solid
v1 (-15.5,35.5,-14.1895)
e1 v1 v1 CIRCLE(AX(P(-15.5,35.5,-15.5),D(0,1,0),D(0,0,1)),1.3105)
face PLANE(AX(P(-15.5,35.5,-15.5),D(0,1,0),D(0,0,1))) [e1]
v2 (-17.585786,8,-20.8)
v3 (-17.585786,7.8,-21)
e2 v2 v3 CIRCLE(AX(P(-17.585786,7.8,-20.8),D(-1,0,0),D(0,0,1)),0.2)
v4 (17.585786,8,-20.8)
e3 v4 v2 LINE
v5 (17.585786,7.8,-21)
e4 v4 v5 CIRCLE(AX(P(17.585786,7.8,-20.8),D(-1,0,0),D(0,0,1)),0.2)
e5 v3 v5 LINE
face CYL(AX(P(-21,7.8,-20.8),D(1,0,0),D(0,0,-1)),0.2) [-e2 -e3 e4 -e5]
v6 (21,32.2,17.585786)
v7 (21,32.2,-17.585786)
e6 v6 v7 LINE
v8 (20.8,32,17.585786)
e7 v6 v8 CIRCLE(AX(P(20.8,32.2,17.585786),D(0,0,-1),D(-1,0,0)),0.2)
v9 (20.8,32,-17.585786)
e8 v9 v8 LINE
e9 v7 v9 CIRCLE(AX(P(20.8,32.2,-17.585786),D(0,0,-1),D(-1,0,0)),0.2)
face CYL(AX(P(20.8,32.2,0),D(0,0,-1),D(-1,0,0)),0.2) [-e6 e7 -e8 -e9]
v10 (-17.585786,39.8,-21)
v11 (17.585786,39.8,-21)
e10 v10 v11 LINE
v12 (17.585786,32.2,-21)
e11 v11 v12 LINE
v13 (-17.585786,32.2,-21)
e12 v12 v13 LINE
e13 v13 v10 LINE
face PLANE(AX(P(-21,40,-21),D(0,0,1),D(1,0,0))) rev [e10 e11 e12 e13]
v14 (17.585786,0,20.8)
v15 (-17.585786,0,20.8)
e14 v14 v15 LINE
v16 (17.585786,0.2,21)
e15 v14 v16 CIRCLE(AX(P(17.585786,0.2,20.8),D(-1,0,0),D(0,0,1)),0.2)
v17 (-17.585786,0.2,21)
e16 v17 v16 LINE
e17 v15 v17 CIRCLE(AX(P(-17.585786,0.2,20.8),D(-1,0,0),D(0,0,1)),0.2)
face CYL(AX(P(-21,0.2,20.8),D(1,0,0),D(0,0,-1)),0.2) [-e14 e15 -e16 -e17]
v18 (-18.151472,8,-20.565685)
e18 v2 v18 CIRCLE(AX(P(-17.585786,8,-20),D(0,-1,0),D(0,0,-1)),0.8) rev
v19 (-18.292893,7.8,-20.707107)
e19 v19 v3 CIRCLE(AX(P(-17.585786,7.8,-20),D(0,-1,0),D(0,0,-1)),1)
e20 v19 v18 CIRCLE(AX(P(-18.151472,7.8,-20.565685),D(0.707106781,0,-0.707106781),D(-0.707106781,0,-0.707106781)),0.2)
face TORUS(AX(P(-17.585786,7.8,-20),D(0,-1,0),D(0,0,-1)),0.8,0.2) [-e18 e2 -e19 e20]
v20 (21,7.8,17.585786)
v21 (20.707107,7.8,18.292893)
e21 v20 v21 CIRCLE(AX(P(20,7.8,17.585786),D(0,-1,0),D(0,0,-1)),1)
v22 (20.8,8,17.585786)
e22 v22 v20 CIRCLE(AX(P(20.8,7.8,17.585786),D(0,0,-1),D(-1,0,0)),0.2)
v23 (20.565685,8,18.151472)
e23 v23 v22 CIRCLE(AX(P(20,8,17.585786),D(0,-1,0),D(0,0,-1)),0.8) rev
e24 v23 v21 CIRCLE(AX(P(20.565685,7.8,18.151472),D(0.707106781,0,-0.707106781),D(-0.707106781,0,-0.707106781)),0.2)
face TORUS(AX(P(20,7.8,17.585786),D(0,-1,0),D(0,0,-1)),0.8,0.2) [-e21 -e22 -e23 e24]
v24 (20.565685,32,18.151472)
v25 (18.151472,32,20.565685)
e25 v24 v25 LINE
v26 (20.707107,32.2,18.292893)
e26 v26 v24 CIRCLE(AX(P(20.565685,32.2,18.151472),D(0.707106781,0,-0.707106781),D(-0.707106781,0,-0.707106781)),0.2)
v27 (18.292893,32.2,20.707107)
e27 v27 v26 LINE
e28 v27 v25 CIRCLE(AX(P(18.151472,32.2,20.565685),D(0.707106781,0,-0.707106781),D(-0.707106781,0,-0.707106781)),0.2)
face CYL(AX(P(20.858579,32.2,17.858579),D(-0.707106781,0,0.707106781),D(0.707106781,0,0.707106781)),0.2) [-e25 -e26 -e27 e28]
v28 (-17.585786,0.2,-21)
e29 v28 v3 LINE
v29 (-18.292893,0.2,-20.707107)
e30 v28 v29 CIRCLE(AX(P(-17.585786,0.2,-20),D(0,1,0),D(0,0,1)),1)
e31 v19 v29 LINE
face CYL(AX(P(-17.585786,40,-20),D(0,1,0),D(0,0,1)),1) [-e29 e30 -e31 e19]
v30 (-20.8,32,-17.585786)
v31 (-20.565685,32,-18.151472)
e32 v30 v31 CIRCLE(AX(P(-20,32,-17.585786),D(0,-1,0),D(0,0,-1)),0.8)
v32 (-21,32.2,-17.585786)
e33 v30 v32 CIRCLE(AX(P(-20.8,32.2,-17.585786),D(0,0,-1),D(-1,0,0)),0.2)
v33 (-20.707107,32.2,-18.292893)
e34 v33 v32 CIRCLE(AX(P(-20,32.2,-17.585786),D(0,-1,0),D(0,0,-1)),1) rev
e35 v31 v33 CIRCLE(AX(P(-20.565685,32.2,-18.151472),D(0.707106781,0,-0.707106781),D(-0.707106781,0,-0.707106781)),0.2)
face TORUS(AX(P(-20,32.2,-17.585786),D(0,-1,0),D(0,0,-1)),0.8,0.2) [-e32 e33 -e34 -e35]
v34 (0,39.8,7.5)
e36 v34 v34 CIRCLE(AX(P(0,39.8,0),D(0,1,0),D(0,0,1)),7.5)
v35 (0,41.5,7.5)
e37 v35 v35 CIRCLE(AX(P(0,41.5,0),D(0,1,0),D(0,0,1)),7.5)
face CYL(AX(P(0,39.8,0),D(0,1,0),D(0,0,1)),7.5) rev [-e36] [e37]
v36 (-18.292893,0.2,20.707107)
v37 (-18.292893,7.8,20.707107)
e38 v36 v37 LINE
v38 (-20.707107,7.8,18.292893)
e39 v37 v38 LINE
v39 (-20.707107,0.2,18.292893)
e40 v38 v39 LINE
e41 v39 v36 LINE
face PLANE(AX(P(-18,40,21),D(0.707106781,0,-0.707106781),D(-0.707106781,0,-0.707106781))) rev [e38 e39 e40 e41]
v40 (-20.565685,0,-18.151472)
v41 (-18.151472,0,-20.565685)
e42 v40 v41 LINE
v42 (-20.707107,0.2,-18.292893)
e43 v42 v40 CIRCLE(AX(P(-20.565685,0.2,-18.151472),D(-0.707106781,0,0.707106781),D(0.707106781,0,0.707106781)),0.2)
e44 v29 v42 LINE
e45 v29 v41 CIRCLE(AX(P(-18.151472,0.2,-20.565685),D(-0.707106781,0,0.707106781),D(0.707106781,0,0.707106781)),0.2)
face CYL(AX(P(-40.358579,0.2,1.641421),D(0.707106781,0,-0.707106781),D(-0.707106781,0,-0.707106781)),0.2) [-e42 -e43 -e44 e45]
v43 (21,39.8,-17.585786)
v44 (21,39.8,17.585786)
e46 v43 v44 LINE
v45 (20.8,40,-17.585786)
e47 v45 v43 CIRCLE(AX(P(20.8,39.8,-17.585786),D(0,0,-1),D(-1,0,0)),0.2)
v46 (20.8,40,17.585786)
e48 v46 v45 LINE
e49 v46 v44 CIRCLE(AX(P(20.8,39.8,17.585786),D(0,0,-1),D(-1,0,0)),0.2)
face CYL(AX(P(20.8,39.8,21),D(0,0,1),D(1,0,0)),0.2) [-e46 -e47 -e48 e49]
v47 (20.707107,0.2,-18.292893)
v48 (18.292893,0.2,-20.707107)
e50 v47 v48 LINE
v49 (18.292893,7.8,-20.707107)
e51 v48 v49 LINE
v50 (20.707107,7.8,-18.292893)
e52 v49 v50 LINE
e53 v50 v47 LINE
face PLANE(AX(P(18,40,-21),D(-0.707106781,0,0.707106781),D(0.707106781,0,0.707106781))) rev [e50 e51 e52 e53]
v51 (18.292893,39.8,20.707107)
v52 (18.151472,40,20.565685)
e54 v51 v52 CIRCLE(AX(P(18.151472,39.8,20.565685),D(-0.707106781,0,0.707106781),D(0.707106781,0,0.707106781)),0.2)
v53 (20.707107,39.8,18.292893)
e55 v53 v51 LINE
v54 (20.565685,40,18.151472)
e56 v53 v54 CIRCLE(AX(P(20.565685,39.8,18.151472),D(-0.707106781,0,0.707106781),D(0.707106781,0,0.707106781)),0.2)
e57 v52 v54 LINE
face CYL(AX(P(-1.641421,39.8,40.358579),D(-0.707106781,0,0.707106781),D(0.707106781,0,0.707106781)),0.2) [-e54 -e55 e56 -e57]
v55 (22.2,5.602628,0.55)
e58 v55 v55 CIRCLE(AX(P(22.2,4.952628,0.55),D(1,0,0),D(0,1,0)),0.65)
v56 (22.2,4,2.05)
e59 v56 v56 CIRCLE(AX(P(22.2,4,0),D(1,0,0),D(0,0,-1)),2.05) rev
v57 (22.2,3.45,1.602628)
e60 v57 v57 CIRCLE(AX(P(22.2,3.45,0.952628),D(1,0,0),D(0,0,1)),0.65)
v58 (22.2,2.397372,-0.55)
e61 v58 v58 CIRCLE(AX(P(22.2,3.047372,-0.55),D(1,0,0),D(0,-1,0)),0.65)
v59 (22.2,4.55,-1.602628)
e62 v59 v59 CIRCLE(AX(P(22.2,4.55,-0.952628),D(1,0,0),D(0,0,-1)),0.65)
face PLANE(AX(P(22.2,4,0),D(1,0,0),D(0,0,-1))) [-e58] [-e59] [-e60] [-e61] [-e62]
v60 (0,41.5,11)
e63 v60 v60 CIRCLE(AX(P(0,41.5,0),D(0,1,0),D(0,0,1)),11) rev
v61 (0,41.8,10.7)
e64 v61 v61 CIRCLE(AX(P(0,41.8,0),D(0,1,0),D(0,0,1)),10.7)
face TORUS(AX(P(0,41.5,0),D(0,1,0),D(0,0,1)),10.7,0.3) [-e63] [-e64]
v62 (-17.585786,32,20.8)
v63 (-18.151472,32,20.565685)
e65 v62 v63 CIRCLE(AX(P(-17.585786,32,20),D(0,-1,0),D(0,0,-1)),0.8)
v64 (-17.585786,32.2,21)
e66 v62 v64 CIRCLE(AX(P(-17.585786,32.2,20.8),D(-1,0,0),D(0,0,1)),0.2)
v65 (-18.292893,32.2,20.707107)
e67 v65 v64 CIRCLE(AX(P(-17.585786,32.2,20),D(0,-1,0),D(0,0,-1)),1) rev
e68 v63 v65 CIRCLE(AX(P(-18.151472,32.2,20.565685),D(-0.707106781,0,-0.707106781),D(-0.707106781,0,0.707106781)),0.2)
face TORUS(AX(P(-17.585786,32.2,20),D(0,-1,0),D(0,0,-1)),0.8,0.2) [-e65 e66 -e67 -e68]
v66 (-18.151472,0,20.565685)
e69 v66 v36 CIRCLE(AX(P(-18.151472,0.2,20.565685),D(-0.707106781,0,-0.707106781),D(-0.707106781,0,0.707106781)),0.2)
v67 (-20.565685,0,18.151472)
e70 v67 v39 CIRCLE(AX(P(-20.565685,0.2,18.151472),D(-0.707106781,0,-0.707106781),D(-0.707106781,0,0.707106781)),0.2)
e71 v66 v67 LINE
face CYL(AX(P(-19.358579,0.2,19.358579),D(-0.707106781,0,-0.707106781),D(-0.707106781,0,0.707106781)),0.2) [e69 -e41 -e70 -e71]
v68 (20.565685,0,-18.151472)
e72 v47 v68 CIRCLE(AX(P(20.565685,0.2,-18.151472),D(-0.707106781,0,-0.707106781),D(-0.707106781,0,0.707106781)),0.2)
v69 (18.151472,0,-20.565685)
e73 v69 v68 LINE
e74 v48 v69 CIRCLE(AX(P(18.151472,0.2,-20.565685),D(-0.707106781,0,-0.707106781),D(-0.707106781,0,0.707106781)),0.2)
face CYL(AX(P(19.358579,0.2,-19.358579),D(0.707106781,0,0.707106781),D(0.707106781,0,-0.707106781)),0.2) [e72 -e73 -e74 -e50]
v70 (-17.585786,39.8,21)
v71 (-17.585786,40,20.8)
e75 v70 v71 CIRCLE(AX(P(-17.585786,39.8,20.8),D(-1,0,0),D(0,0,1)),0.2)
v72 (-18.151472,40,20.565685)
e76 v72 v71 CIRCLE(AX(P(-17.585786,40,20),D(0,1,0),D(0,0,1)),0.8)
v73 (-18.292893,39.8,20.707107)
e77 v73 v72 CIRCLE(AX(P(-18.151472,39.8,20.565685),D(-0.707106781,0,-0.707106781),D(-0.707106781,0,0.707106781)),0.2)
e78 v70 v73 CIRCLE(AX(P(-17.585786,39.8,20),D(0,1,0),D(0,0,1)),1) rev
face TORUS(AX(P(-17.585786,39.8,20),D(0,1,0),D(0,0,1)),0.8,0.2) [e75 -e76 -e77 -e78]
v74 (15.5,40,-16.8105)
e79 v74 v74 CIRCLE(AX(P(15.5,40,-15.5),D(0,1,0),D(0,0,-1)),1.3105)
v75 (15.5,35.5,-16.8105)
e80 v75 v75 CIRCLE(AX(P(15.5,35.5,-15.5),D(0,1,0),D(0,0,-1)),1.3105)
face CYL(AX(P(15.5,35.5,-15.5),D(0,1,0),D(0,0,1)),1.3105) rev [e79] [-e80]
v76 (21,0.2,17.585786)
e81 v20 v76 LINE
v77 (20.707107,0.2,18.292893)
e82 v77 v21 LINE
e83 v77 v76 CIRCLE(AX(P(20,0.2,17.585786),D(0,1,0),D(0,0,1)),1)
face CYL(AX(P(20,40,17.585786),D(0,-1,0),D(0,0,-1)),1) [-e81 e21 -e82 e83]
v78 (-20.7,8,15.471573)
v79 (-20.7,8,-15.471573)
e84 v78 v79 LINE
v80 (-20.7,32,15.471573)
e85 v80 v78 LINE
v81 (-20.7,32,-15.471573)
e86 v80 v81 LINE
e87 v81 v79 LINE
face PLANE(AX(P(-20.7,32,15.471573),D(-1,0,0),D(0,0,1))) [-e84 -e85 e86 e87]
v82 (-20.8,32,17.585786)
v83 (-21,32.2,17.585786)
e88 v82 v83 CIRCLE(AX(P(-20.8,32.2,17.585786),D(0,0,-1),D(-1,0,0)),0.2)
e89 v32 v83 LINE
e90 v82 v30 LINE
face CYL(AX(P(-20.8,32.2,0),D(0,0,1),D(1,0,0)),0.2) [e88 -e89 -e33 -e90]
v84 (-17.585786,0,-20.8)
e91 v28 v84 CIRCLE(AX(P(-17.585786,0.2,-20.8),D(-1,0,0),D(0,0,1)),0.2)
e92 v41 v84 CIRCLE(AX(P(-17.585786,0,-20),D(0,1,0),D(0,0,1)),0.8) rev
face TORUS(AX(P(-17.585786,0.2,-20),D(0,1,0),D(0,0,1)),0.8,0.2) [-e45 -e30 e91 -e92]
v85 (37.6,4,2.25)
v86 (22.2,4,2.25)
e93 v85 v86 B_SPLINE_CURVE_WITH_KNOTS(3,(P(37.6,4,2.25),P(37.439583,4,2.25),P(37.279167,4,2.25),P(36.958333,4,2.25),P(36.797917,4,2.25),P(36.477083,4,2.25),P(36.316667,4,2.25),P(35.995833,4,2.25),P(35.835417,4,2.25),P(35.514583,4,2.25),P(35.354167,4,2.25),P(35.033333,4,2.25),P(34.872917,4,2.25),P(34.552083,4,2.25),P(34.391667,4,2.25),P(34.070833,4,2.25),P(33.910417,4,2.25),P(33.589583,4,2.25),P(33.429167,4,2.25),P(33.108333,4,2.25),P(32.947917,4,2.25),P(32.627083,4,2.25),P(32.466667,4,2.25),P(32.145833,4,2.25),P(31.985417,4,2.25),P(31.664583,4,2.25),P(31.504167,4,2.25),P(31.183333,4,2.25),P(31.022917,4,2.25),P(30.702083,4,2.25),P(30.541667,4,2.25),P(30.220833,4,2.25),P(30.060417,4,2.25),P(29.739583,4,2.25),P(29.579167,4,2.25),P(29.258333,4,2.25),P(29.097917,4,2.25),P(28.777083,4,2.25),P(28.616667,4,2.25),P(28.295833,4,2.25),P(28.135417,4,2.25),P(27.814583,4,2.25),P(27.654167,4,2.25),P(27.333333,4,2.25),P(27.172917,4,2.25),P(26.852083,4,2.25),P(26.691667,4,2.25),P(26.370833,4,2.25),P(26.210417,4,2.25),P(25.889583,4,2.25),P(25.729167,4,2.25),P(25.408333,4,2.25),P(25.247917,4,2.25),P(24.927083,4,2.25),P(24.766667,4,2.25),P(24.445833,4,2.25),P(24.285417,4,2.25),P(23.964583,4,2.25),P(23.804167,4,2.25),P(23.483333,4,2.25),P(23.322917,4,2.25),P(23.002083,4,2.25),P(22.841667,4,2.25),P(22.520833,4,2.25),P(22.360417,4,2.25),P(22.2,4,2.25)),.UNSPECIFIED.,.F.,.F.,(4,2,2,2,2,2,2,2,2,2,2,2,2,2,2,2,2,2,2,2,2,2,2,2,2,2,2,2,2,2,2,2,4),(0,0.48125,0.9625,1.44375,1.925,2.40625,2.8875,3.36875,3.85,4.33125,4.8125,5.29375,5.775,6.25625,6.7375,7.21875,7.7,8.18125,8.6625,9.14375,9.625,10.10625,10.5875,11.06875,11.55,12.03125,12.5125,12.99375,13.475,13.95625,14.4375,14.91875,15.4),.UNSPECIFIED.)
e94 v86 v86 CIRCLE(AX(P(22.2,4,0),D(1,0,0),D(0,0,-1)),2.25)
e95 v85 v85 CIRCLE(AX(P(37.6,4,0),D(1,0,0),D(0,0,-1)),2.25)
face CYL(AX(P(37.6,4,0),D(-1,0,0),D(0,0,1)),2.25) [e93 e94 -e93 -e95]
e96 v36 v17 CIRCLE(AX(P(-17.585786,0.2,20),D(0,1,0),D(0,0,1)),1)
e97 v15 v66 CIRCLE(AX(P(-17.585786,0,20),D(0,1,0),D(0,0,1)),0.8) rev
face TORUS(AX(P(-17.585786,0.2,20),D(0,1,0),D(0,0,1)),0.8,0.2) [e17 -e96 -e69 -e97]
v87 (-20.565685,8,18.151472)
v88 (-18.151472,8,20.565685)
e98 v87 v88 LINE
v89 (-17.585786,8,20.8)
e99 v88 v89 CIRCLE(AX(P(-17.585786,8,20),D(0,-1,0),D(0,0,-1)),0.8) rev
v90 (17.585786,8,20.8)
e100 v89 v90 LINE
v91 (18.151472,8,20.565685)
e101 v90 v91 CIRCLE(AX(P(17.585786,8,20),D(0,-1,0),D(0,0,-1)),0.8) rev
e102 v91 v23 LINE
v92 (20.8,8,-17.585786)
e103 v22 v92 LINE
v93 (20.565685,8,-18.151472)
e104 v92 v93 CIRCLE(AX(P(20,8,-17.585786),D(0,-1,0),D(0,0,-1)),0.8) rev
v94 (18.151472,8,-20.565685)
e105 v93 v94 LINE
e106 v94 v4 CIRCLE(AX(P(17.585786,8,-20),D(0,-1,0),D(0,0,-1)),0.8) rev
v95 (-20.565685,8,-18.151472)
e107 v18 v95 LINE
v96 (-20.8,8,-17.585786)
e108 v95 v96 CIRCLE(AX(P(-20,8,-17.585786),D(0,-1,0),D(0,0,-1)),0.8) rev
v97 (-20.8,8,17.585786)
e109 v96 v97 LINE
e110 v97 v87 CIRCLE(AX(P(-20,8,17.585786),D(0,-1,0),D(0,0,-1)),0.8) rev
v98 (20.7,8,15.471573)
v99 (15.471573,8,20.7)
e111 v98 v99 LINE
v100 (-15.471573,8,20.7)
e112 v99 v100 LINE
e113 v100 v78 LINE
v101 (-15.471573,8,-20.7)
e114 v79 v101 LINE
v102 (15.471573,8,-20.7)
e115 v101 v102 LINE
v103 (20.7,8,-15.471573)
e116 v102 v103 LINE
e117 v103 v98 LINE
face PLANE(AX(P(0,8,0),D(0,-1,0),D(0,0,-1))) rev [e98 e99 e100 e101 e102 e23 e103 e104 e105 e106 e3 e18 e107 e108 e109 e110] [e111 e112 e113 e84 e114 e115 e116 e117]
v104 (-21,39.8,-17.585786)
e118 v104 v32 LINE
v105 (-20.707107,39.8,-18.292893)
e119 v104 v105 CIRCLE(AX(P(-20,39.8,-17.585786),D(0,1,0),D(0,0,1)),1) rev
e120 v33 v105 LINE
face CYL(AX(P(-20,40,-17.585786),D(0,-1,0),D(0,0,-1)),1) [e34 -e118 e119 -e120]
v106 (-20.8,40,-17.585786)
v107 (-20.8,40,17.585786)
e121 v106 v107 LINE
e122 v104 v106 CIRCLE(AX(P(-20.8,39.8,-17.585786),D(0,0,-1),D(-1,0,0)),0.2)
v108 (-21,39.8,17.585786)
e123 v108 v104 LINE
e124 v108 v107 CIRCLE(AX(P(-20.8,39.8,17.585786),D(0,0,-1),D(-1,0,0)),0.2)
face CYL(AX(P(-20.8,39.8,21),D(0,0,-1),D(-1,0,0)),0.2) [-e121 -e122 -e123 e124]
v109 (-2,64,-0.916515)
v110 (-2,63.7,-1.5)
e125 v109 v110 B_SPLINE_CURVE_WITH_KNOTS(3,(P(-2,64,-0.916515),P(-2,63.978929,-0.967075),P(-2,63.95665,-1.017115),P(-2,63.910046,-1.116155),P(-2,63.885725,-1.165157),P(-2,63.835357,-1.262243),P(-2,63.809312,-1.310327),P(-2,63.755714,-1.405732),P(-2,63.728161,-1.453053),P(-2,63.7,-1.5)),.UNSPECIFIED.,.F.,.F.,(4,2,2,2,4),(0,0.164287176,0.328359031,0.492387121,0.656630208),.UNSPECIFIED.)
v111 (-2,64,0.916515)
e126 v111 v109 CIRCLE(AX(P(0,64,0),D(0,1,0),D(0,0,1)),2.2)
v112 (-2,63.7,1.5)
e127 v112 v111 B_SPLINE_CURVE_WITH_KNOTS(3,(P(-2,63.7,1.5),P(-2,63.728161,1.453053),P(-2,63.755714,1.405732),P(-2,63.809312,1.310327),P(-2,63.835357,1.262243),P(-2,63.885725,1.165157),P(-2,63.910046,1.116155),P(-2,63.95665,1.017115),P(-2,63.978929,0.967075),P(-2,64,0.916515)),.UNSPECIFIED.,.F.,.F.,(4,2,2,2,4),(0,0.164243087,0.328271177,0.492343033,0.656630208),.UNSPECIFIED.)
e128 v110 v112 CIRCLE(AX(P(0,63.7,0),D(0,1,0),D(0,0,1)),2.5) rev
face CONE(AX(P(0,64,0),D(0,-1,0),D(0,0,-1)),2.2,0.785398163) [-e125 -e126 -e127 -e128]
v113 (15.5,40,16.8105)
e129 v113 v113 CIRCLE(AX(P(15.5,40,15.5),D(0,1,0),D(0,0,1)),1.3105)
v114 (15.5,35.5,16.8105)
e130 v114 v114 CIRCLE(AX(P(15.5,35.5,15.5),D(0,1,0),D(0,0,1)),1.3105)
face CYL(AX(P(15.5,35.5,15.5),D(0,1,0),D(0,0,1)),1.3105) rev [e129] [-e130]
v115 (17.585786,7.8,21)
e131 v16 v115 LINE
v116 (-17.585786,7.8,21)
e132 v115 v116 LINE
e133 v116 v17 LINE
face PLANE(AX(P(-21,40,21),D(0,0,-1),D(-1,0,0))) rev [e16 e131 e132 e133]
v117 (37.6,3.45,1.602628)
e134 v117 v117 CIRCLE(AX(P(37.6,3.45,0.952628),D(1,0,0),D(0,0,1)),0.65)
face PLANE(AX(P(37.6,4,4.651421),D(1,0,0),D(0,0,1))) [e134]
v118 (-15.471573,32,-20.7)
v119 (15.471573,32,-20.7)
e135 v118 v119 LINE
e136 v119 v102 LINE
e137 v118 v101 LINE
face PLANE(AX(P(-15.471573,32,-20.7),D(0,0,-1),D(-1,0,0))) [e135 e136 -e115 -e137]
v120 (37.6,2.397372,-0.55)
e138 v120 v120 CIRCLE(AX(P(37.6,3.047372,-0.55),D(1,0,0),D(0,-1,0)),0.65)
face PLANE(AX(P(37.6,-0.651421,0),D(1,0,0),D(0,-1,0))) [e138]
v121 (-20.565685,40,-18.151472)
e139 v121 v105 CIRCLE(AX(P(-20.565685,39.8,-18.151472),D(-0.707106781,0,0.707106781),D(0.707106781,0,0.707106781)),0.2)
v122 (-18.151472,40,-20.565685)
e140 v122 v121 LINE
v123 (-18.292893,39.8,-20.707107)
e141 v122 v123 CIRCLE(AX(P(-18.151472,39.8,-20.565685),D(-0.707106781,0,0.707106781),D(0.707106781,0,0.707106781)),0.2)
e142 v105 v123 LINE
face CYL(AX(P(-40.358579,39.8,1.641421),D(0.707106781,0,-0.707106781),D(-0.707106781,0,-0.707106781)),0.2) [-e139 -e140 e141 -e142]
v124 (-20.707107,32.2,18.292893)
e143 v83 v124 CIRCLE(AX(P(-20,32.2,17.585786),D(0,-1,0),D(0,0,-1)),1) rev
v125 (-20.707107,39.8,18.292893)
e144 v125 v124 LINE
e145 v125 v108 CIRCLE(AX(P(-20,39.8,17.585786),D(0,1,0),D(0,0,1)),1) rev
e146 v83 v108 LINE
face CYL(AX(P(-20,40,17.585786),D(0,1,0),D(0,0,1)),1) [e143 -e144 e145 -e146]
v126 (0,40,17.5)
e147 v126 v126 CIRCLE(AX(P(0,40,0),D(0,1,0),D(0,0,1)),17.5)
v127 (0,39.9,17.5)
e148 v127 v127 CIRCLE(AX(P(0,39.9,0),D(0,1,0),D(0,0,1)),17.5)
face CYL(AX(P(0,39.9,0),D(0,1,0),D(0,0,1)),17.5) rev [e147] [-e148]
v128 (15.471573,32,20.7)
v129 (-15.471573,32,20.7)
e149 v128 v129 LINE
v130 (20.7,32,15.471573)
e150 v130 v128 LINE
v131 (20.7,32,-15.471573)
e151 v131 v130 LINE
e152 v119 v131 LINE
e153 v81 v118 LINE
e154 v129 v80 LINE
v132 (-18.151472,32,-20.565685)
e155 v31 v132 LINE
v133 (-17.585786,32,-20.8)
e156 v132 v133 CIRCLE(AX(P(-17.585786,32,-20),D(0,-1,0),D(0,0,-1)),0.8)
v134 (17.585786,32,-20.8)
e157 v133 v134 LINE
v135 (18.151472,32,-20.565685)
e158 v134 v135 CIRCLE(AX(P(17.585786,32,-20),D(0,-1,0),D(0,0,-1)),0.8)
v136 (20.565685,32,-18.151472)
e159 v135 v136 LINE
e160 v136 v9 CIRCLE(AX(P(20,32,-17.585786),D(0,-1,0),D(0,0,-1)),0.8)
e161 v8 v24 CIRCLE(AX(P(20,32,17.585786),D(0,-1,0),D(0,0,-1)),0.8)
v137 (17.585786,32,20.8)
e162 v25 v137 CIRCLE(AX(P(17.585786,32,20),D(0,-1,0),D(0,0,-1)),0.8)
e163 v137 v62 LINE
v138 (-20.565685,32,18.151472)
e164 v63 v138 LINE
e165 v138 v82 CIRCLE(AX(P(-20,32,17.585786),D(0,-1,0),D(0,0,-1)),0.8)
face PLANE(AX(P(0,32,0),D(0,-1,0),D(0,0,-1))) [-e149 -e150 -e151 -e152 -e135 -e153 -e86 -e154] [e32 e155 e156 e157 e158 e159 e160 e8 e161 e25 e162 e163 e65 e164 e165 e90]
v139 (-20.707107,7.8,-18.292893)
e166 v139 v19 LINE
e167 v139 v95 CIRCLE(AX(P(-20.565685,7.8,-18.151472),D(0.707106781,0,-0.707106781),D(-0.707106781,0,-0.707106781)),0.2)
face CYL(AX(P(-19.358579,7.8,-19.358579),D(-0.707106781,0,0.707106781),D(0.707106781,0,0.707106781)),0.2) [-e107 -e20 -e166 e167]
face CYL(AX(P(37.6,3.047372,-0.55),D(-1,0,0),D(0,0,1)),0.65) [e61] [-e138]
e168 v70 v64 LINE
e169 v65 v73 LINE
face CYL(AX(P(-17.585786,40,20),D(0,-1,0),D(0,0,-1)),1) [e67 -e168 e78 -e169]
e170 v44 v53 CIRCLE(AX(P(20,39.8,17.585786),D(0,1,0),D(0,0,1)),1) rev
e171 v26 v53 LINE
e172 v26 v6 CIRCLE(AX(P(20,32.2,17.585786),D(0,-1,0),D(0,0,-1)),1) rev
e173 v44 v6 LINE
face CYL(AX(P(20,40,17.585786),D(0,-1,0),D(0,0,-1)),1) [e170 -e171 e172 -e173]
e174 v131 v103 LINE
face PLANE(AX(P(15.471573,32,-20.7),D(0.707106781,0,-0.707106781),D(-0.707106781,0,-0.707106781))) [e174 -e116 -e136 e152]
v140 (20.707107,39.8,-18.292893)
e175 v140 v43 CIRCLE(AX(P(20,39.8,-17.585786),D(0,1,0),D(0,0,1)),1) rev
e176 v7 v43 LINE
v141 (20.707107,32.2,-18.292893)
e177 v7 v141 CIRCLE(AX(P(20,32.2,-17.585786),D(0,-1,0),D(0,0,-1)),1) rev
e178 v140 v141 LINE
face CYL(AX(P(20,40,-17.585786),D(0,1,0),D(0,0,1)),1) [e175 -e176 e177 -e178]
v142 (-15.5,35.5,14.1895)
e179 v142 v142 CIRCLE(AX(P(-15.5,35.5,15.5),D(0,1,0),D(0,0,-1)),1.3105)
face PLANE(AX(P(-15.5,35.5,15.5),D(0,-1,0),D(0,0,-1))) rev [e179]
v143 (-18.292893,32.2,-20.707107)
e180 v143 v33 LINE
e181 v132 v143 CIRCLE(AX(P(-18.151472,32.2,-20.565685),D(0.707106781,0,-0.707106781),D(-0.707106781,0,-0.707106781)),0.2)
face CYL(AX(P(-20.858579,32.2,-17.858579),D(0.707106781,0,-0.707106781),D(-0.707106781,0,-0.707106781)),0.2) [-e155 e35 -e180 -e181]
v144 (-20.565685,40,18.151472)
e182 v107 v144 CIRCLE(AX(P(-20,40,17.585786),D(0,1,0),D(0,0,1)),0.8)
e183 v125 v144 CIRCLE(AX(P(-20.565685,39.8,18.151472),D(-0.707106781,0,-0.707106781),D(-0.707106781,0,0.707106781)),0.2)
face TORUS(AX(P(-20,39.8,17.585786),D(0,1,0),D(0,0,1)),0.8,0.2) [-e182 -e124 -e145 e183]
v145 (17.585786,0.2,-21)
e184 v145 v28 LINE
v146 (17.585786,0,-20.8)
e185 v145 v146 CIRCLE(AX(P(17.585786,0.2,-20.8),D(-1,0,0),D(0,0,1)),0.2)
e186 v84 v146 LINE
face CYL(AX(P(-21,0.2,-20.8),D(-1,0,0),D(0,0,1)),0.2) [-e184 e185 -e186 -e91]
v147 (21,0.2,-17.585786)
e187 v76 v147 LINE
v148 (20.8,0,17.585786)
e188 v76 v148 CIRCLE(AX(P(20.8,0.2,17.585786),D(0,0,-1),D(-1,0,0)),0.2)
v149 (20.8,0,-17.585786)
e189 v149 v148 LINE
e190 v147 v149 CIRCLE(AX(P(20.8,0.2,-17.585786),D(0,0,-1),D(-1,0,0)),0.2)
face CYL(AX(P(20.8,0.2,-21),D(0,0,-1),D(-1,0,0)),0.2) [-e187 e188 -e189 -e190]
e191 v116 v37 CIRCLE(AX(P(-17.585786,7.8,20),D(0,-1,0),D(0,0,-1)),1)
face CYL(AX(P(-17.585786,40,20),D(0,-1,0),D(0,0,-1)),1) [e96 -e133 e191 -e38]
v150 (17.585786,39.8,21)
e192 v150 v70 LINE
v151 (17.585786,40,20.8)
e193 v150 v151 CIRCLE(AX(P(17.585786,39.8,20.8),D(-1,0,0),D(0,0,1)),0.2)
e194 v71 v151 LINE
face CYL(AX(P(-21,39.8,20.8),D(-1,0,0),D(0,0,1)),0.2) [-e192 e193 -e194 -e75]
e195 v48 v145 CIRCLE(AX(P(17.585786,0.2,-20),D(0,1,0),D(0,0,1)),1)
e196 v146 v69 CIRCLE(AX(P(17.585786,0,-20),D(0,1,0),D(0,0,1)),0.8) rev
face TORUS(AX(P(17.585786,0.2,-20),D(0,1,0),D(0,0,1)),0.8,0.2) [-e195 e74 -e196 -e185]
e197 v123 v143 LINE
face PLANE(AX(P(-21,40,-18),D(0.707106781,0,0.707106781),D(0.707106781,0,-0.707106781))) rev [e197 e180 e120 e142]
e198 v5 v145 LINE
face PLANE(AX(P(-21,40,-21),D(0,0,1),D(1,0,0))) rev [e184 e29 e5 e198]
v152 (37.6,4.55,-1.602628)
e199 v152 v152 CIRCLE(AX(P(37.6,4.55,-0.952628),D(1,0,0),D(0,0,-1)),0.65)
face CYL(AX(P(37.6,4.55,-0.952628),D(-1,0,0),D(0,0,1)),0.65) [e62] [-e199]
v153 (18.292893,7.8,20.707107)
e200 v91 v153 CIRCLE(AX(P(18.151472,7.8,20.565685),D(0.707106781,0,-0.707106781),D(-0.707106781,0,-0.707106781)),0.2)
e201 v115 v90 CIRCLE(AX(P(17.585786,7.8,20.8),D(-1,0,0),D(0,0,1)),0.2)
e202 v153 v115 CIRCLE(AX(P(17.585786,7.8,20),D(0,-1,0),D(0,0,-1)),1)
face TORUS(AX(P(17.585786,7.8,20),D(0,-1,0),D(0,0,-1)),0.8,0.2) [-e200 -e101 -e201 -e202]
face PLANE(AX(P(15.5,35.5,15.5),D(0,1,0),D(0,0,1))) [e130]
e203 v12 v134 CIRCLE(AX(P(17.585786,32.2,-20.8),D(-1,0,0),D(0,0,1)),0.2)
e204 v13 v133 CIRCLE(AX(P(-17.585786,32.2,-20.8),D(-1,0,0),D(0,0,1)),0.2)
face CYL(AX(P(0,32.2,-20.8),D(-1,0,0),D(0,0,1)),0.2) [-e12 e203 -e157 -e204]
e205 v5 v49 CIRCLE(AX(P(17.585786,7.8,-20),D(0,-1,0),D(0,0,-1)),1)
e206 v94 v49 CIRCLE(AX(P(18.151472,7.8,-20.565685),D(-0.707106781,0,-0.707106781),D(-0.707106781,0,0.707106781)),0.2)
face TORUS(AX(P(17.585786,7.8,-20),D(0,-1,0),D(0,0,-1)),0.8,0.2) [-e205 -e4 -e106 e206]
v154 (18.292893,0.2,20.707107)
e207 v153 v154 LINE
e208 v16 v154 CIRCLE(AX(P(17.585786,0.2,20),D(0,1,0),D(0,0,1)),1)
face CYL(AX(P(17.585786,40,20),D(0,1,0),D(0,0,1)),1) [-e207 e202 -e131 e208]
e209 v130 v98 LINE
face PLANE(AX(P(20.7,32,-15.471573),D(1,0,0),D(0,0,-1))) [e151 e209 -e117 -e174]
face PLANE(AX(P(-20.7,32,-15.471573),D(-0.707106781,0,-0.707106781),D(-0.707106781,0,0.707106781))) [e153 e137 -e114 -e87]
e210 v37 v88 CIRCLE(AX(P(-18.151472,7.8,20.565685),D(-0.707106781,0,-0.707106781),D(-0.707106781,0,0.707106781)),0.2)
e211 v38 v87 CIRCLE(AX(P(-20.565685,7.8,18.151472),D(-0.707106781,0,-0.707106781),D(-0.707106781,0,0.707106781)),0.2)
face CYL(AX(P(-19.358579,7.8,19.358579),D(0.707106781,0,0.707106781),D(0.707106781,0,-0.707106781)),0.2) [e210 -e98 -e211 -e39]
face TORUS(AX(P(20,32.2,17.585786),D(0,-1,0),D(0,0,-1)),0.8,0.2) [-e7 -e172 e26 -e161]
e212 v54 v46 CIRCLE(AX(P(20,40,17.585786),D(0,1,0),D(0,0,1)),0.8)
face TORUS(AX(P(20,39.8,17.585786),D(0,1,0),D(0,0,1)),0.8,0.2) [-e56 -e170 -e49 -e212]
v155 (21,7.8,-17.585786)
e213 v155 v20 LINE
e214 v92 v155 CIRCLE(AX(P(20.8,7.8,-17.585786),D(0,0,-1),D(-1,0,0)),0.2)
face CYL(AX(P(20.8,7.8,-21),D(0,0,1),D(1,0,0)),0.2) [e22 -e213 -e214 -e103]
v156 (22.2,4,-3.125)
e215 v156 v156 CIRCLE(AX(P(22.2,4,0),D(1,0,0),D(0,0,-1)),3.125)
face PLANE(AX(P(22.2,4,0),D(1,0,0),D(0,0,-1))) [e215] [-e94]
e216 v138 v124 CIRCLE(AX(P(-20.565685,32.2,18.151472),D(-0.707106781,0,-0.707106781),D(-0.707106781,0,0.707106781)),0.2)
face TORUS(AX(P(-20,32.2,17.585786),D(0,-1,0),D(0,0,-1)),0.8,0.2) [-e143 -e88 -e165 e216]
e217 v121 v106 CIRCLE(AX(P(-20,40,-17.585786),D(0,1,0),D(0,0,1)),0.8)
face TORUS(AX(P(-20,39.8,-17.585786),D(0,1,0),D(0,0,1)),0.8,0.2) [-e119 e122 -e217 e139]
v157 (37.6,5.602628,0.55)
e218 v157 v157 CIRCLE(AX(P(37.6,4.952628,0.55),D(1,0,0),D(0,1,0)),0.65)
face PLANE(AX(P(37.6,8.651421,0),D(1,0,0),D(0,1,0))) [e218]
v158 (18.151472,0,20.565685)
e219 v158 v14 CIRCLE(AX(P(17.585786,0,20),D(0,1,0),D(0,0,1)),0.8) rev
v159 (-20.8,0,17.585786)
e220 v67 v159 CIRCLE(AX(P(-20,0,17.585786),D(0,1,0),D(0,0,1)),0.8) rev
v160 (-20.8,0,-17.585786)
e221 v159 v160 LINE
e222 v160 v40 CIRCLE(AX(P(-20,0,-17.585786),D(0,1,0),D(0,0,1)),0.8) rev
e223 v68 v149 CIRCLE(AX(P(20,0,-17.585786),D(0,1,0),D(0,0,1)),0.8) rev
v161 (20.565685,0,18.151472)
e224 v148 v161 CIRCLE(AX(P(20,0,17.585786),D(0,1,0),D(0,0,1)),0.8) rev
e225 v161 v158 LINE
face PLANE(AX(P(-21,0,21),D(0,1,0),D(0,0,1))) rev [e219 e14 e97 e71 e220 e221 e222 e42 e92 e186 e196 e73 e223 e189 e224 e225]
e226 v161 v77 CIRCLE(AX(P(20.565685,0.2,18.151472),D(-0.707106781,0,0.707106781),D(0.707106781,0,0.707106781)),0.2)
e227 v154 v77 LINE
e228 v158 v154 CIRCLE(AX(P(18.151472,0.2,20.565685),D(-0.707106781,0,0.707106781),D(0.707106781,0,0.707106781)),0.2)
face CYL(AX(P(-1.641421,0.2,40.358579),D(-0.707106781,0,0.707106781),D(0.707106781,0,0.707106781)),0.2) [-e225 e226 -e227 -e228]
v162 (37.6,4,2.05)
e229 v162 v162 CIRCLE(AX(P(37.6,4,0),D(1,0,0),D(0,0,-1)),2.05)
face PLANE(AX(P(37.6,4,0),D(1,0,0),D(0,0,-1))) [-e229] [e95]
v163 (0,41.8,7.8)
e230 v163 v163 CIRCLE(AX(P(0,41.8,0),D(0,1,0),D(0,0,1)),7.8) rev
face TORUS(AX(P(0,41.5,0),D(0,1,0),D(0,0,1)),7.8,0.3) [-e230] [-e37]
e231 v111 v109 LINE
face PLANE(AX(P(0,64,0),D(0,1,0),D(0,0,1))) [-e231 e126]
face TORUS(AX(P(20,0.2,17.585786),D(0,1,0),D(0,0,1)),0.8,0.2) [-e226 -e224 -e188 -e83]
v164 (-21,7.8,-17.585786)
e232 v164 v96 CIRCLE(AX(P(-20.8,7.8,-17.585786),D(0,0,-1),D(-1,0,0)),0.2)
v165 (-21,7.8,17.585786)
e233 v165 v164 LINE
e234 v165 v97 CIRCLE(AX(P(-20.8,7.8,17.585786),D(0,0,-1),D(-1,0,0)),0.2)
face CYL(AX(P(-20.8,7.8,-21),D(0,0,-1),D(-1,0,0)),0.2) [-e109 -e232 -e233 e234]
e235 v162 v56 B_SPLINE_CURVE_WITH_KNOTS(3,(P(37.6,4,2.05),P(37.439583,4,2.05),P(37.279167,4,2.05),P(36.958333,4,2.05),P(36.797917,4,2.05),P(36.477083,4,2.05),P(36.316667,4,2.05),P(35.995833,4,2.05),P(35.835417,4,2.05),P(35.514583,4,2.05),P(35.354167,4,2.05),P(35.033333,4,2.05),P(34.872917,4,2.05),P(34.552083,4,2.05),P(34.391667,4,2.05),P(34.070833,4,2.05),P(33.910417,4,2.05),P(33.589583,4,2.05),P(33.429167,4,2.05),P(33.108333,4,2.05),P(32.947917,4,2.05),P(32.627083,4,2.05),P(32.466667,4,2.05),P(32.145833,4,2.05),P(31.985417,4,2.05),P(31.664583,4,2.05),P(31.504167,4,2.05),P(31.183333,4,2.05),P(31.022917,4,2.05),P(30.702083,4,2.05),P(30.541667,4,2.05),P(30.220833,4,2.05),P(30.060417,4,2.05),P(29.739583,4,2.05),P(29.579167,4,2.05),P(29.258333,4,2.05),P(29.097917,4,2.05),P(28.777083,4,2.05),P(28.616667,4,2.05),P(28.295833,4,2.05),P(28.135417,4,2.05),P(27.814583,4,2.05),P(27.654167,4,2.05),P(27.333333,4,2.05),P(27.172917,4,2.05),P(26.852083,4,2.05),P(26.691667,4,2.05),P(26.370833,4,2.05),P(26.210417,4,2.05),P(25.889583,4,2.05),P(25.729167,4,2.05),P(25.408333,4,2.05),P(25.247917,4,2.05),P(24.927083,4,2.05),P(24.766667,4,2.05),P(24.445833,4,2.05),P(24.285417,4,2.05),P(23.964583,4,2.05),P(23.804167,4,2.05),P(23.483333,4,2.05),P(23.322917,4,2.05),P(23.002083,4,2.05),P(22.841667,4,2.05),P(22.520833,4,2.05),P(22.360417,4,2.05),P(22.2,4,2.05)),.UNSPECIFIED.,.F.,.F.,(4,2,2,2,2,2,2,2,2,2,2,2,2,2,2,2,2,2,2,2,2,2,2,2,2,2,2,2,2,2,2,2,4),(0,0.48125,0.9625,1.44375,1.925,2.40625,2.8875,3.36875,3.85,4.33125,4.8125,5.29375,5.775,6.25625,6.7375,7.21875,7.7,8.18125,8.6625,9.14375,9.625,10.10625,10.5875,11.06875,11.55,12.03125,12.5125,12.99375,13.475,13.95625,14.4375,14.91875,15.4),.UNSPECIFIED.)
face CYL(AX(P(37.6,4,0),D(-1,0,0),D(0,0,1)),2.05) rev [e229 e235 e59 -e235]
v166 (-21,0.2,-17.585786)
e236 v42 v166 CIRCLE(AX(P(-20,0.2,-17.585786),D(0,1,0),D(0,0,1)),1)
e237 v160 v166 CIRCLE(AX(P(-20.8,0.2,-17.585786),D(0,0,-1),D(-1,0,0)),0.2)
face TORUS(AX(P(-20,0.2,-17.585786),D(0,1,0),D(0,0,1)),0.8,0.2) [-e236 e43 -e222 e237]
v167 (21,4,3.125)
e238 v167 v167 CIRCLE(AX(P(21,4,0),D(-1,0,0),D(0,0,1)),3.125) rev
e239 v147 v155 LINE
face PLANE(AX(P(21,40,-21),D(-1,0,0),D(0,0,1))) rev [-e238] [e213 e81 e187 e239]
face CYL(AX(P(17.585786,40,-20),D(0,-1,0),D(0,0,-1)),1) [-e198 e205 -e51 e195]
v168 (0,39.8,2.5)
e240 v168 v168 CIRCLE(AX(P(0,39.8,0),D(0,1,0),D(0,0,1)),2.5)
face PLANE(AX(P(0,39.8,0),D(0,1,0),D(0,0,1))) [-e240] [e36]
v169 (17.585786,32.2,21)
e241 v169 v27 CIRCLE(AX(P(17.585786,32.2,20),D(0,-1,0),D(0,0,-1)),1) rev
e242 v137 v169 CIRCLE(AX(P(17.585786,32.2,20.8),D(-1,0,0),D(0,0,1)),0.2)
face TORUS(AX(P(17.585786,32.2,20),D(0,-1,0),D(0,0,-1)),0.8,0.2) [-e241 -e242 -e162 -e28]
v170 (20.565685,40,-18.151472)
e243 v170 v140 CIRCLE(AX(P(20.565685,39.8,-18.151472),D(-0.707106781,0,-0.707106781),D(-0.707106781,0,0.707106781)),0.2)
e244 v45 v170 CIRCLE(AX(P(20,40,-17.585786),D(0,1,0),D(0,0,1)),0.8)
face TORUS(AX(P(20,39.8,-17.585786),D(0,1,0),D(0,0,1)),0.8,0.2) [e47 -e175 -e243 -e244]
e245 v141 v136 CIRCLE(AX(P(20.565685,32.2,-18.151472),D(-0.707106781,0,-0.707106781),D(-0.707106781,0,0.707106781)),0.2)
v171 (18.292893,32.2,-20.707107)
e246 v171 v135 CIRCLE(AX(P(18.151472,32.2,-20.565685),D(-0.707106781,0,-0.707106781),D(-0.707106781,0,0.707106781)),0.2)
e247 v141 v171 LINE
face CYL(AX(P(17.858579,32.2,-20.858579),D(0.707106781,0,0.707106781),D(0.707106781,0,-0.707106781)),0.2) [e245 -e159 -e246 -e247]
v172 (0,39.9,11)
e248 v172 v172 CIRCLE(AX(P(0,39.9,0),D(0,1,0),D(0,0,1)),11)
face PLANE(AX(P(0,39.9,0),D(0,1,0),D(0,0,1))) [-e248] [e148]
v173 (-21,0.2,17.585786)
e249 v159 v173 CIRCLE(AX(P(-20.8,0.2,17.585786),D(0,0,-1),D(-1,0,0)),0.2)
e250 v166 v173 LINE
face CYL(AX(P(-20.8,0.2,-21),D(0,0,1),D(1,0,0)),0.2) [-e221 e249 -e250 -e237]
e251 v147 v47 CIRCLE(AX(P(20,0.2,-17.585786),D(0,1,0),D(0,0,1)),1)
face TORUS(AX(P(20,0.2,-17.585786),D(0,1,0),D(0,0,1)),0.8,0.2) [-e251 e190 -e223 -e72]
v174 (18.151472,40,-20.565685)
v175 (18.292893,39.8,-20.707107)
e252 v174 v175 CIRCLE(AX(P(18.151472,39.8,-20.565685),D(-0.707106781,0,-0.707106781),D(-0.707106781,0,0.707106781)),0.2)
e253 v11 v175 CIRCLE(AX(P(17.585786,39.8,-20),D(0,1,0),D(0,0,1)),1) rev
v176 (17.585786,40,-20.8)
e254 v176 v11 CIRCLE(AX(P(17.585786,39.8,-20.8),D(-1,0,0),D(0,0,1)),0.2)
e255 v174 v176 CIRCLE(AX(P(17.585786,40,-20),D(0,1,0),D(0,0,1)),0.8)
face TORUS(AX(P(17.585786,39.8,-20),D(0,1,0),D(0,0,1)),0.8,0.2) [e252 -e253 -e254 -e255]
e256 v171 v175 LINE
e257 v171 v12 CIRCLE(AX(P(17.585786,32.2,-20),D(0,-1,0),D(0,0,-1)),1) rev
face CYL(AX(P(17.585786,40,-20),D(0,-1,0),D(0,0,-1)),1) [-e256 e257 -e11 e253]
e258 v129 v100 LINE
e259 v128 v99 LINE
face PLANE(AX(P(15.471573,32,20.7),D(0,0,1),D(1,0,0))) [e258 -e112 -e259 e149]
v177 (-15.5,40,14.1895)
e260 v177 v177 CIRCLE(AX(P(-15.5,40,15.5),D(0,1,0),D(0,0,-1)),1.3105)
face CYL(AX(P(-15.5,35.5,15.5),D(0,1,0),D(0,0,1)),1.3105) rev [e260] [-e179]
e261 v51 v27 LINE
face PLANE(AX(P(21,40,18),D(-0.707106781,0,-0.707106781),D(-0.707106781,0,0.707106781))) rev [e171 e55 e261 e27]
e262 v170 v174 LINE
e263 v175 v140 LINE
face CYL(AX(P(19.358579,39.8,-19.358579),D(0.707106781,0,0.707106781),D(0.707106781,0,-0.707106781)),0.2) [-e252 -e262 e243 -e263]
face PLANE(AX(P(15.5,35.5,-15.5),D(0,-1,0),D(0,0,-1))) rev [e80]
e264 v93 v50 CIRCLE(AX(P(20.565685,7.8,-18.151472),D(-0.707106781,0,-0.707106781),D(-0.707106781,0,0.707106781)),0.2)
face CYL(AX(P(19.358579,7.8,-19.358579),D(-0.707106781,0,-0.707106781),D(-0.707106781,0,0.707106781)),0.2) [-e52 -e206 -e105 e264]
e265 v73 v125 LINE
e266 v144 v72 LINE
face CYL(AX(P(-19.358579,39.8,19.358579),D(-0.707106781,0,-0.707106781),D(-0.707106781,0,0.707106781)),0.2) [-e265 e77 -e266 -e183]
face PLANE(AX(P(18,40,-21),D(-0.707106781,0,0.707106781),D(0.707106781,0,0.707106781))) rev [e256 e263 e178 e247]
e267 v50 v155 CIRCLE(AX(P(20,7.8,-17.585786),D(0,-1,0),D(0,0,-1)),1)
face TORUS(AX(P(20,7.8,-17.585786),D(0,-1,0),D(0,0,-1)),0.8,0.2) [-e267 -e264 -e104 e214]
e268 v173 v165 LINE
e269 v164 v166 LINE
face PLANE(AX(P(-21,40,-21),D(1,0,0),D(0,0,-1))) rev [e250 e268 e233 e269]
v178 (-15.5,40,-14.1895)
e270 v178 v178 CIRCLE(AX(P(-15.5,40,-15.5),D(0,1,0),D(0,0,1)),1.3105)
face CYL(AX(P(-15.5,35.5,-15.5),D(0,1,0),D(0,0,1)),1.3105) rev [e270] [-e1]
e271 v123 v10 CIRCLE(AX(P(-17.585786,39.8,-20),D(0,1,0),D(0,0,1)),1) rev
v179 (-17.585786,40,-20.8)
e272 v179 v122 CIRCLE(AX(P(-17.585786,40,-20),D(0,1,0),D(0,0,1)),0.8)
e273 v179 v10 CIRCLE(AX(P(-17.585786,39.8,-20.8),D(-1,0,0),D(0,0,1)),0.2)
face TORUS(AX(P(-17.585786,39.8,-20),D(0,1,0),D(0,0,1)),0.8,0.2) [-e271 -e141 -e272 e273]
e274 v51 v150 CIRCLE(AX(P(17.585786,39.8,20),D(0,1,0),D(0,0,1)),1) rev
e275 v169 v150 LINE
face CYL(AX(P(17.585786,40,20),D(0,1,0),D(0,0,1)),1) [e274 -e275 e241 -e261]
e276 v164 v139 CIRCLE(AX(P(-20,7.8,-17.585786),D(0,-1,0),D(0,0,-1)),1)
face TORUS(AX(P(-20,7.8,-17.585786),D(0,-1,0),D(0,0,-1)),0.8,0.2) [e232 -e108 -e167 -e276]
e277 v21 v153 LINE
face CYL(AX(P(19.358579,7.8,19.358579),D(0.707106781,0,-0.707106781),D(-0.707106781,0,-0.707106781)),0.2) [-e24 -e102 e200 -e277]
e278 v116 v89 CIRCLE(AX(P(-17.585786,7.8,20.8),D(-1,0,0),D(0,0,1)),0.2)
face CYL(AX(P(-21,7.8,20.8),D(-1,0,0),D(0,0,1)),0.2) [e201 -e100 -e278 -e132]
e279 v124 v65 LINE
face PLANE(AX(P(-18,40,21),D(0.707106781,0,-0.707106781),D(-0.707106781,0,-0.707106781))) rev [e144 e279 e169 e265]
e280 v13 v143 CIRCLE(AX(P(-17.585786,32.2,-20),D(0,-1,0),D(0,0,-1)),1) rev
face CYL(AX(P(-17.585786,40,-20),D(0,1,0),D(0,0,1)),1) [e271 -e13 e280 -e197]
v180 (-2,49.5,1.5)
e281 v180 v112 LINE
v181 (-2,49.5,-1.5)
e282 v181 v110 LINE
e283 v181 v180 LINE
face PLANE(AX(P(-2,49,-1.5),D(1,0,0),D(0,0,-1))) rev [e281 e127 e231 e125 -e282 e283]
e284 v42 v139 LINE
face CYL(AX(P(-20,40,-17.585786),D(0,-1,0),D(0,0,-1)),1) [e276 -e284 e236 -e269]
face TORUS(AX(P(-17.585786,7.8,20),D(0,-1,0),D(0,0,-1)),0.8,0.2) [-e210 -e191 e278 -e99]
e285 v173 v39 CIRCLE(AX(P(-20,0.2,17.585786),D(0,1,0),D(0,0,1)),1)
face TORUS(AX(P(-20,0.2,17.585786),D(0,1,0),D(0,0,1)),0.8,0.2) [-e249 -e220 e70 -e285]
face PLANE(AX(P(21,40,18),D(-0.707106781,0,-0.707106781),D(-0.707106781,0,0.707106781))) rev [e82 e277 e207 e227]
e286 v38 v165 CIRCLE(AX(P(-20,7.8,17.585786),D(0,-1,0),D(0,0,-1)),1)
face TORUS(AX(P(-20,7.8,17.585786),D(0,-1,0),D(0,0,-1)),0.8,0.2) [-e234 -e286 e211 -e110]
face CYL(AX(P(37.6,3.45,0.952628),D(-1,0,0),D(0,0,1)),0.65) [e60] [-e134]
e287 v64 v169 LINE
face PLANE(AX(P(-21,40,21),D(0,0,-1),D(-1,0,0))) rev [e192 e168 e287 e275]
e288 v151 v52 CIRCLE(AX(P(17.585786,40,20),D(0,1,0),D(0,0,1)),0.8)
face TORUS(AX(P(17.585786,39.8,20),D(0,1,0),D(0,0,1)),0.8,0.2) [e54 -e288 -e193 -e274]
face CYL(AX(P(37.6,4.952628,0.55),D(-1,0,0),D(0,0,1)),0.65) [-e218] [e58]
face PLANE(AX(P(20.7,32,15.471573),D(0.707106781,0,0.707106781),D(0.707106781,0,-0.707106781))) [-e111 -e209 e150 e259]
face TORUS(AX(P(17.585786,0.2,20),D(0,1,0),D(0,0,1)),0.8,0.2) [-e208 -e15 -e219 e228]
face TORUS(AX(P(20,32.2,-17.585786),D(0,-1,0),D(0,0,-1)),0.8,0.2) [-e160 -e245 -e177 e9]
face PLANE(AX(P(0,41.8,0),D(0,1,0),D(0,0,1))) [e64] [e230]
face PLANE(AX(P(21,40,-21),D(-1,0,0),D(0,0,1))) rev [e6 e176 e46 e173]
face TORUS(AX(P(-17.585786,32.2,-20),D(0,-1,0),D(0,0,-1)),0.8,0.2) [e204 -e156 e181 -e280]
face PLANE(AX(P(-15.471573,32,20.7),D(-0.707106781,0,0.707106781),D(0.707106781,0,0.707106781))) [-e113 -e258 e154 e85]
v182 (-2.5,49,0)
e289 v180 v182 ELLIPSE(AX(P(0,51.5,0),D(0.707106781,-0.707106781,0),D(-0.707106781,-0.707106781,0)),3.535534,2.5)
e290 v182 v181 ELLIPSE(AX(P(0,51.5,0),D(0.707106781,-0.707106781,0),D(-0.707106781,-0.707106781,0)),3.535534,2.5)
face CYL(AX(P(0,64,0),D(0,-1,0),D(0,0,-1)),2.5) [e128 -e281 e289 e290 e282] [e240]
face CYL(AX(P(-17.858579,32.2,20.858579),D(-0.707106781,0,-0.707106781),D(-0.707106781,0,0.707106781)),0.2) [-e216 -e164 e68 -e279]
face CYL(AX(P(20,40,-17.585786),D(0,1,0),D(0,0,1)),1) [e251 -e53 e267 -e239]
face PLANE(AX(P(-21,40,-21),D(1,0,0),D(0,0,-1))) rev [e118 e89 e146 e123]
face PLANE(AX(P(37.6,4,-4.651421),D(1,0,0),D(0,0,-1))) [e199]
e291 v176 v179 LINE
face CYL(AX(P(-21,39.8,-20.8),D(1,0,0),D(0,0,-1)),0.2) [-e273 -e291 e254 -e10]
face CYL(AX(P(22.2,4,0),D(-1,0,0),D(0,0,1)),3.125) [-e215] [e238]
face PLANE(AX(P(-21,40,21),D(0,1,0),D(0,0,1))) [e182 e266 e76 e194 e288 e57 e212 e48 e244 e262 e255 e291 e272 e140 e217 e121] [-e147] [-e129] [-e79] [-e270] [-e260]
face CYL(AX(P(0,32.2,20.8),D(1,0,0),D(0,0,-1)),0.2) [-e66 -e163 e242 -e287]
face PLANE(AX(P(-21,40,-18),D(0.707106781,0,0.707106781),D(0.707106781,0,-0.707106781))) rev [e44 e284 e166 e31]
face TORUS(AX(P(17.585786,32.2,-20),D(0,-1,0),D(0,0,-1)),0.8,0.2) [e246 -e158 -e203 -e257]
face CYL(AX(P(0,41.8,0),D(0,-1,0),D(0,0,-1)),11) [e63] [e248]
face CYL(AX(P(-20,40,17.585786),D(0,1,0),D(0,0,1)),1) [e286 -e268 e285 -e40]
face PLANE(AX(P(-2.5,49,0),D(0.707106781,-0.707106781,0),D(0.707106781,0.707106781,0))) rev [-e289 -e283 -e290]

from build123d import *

# Parameters (mm, degrees)
SKETCH_1_W               = 42
SKETCH_1_H               = 42
EXTRUDE_1_DEPTH          = 40
CHAMFER_3_SIZE           = 3
SKETCH_2_R               = 11
EXTRUDE_2_DEPTH          = 1.8
SKETCH_3_R               = 2.5
EXTRUDE_3_DEPTH          = 24
SKETCH_4_OUTSIDE_W       = 61.464
SKETCH_4_OUTSIDE_H       = 61.464
CUT_EXTRUDE_1_DEPTH      = 24
FILLET_2_R               = 1
FILLET_3_R               = 0.2
CUT_EXTRUDE_START        = -15
CUT_EXTRUDE_5_DEPTH      = 15
CHAMFER_5_SIZE           = 0.3
CHAMFER_4_SIZE           = 0.5
SKETCH_6_R               = 1.3105
CUT_EXTRUDE_2_DEPTH      = 4.5
CUT_EXTRUDE_START_2      = -2
SKETCH_7_R               = 7.5
SKETCH_7_R_2             = 2.5
CUT_EXTRUDE_3_DEPTH      = 2
SKETCH_8_R               = 3.125
EXTRUDE_5_DEPTH          = 1.2
SKETCH_9_R               = 2.25
SKETCH_9_R_2             = 2.05
EXTRUDE_6_DEPTH          = 15.4
SKETCH_10_R              = 0.65
EXTRUDE_8_DEPTH          = 15.4
CUT_EXTRUDE_START_3      = -0.1
SKETCH_15_R              = 17.5
SKETCH_15_R_2            = 11
CUT_EXTRUDE_6_DEPTH      = 0.1
FILLET_4_R               = 0.3
PATTERN_CIRCULAR_3_COUNT = 4


with BuildPart() as part:
    # 草图1 → 凸台-拉伸1 (new body)
    with BuildSketch(Plane(origin=(0, 0, 0), x_dir=(1, 0, 0), z_dir=(0, 1, 0))):
        Rectangle(SKETCH_1_W, SKETCH_1_H)
    extrude(amount=EXTRUDE_1_DEPTH)

    # 倒角3
    chamfer_3_edges = [part.edges().sort_by_distance(p)[0] for p in [
        (-21, 20, -21),
        (21, 20, -21),
        (21, 20, 21),
        (-21, 20, 21),
    ]]
    chamfer(chamfer_3_edges, length=CHAMFER_3_SIZE)

    # 草图2 → 凸台-拉伸2 (add)
    with BuildSketch(Plane(origin=(0, 40, 0), x_dir=(1, 0, 0), z_dir=(0, 1, 0))):
        with Locations(Location((0, 0, 0), (0, 0, 270))):
            Circle(SKETCH_2_R)
    extrude(amount=EXTRUDE_2_DEPTH)

    # 草图3 → 凸台-拉伸3 (add)
    with BuildSketch(Plane(origin=(0, 40, 0), x_dir=(1, 0, 0), z_dir=(0, 1, 0))):
        with Locations(Location((0, 0, 0), (0, 0, 270))):
            Circle(SKETCH_3_R)
    extrude(amount=EXTRUDE_3_DEPTH)

    # 草图4 outside → 切除-拉伸1 (cut)
    with BuildSketch(Plane.XZ.offset(-8)):
        Rectangle(SKETCH_4_OUTSIDE_W, SKETCH_4_OUTSIDE_H)
        Polygon((15.471572875, 20.7), (-15.471572875, 20.7), (-20.7, 15.471572875), (-20.7, -15.471572875), (-15.471572875, -20.7), (15.471572875, -20.7), (20.7, -15.471572875), (20.7, 15.471572875), align=None, mode=Mode.SUBTRACT)
    extrude(amount=-CUT_EXTRUDE_1_DEPTH, mode=Mode.SUBTRACT)

    # 圆角2
    fillet_2_edges = [part.edges().sort_by_distance(p)[0] for p in [
        (-18, 4, -21),
        (18, 36, -21),
        (21, 36, 18),
        (21, 4, -18),
        (-18, 36, 21),
        (18, 4, 21),
        (-21, 36, -18),
        (-21, 4, 18),
        (-18, 36, -21),
        (-21, 4, -18),
        (-21, 36, 18),
        (-18, 4, 21),
        (18, 36, 21),
        (21, 4, 18),
        (21, 36, -18),
        (18, 4, -21),
    ]]
    fillet(fillet_2_edges, radius=FILLET_2_R)

    # 圆角3
    fillet_3_edges = [part.edges().sort_by_distance(p)[0] for p in [
        (21, 8, 0),
        (21, 0, 0),
        (0, 0, -21),
        (19.5, 0, -19.5),
        (19.5, 0, 19.5),
        (0, 0, 21),
        (-19.5, 0, 19.5),
        (-21, 0, 0),
        (-19.5, 0, -19.5),
        (-20.923879533, 0, -17.96846987),
        (-17.96846987, 0, -20.923879533),
        (17.96846987, 0, -20.923879533),
        (20.923879533, 0, -17.96846987),
        (-20.923879533, 0, 17.96846987),
        (-17.96846987, 0, 20.923879533),
        (17.96846987, 0, 20.923879533),
        (20.923879533, 0, 17.96846987),
        (19.5, 8, 19.5),
        (19.5, 8, -19.5),
        (0, 8, -21),
        (-19.5, 8, -19.5),
        (-21, 8, 0),
        (-19.5, 8, 19.5),
        (0, 8, 21),
        (-20.923879533, 8, -17.96846987),
        (-17.96846987, 8, -20.923879533),
        (17.96846987, 8, -20.923879533),
        (20.923879533, 8, -17.96846987),
        (-20.923879533, 8, 17.96846987),
        (-17.96846987, 8, 20.923879533),
        (17.96846987, 8, 20.923879533),
        (20.923879533, 8, 17.96846987),
        (0, 32, -21),
        (0, 40, -21),
        (21, 40, 0),
        (19.5, 40, -19.5),
        (-19.5, 40, -19.5),
        (-21, 40, 0),
        (-19.5, 40, 19.5),
        (0, 40, 21),
        (19.5, 40, 19.5),
        (-20.923879533, 40, 17.96846987),
        (-17.96846987, 40, 20.923879533),
        (17.96846987, 40, 20.923879533),
        (20.923879533, 40, 17.96846987),
        (17.96846987, 40, -20.923879533),
        (20.923879533, 40, -17.96846987),
        (-20.923879533, 40, -17.96846987),
        (-17.96846987, 40, -20.923879533),
        (-19.5, 32, -19.5),
        (0, 32, 21),
        (-19.5, 32, 19.5),
        (-21, 32, 0),
        (19.5, 32, -19.5),
        (21, 32, 0),
        (19.5, 32, 19.5),
        (-20.923879533, 32, 17.96846987),
        (-17.96846987, 32, 20.923879533),
        (17.96846987, 32, 20.923879533),
        (20.923879533, 32, 17.96846987),
        (17.96846987, 32, -20.923879533),
        (20.923879533, 32, -17.96846987),
        (-20.923879533, 32, -17.96846987),
        (-17.96846987, 32, -20.923879533),
    ]]
    fillet(fillet_3_edges, radius=FILLET_3_R)

    # 草图14 → 切除-拉伸5 (cut)
    with BuildSketch(Plane(origin=(0, 64, 0), x_dir=(1, 0, 0), z_dir=(0, 1, 0)).offset(CUT_EXTRUDE_START)):
        with BuildLine():
            Line((-2, 1.5), (-2, -1.5))
            ThreePointArc((-2, -1.5), (-2.5, 0), (-2, 1.5))
        make_face()
    extrude(amount=CUT_EXTRUDE_5_DEPTH, mode=Mode.SUBTRACT)

    # 倒角5
    chamfer_5_edges = [part.edges().sort_by_distance(p)[0] for p in [
        (2.236067977, 64, -1.118033989),
    ]]
    chamfer(chamfer_5_edges, length=CHAMFER_5_SIZE)

    # 倒角4
    chamfer_4_edges = [part.edges().sort_by_distance(p)[0] for p in [
        (-2, 49, 0),
    ]]
    chamfer(chamfer_4_edges, length=CHAMFER_4_SIZE - 0.0001)  # a hair under: the kernel refuses the full size

    # 草图6 → 切除-拉伸2 (cut)
    with BuildSketch(Plane(origin=(0, 40, 0), x_dir=(1, 0, 0), z_dir=(0, 1, 0))):
        with Locations(Location((-15.5, 15.5, 0), (0, 0, 270))):
            Circle(SKETCH_6_R)
        with Locations(Location((15.5, 15.5, 0), (0, 0, 90))):
            Circle(SKETCH_6_R)
        with Locations(Location((15.5, -15.5, 0), (0, 0, 270))):
            Circle(SKETCH_6_R)
        with Locations(Location((-15.5, -15.5, 0), (0, 0, 90))):
            Circle(SKETCH_6_R)
    extrude(amount=-CUT_EXTRUDE_2_DEPTH, mode=Mode.SUBTRACT)

    # 草图7 → 切除-拉伸3 (cut)
    with BuildSketch(Plane(origin=(0, 41.8, 0), x_dir=(1, 0, 0), z_dir=(0, 1, 0)).offset(CUT_EXTRUDE_START_2)):
        with Locations(Location((0, 0, 0), (0, 0, 270))):
            Circle(SKETCH_7_R)
        with Locations(Location((0, 0, 0), (0, 0, 143.130102354))):
            Circle(SKETCH_7_R_2, mode=Mode.SUBTRACT)
    extrude(amount=CUT_EXTRUDE_3_DEPTH, mode=Mode.SUBTRACT)

    # 草图8 → 凸台-拉伸5 (add)
    with BuildSketch(Plane(origin=(21, 0, 0), x_dir=(0, 0, -1), z_dir=(1, 0, 0))):
        with Locations(Location((0, 4, 0), (0, 0, 180))):
            Circle(SKETCH_8_R)
    extrude(amount=EXTRUDE_5_DEPTH)

    # 草图9 → 凸台-拉伸6 (add)
    with BuildSketch(Plane(origin=(22.2, 0, 0), x_dir=(0, 0, -1), z_dir=(1, 0, 0))):
        with Locations(Location((0, 4, 0), (0, 0, 180))):
            Circle(SKETCH_9_R)
        with Locations(Location((0, 4, 0), (0, 0, 180))):
            Circle(SKETCH_9_R_2, mode=Mode.SUBTRACT)
    extrude(amount=EXTRUDE_6_DEPTH)

    # 草图10 → 凸台-拉伸8 (add)
    with BuildSketch(Plane(origin=(22.2, 0, 0), x_dir=(0, 0, -1), z_dir=(1, 0, 0))):
        with Locations((0.952627944, 4.55)):
            Circle(SKETCH_10_R)
    extrude_8 = extrude(amount=EXTRUDE_8_DEPTH)

    # 草图15 → 切除-拉伸6 (cut)
    with BuildSketch(Plane(origin=(0, 40, 0), x_dir=(1, 0, 0), z_dir=(0, 1, 0)).offset(CUT_EXTRUDE_START_3)):
        with Locations(Location((0, 0, 0), (0, 0, 270))):
            Circle(SKETCH_15_R)
        with Locations(Location((0, 0, 0), (0, 0, 270))):
            Circle(SKETCH_15_R_2, mode=Mode.SUBTRACT)
    extrude(amount=CUT_EXTRUDE_6_DEPTH, mode=Mode.SUBTRACT)

    # 圆角4
    fillet_4_edges = [part.edges().sort_by_distance(p)[0] for p in [
        (0, 41.8, -11),
        (0, 41.8, -7.5),
    ]]
    fillet(fillet_4_edges, radius=FILLET_4_R)

    # 阵列(圆周)3: 凸台-拉伸8 ×4 about axis
    pattern_circular_3_axis = Axis((0, 4, 0), (1, 0, 0))
    for i in range(1, PATTERN_CIRCULAR_3_COUNT):
        add(extrude_8.rotate(pattern_circular_3_axis, i * 360 / PATTERN_CIRCULAR_3_COUNT))


solid = part.part
